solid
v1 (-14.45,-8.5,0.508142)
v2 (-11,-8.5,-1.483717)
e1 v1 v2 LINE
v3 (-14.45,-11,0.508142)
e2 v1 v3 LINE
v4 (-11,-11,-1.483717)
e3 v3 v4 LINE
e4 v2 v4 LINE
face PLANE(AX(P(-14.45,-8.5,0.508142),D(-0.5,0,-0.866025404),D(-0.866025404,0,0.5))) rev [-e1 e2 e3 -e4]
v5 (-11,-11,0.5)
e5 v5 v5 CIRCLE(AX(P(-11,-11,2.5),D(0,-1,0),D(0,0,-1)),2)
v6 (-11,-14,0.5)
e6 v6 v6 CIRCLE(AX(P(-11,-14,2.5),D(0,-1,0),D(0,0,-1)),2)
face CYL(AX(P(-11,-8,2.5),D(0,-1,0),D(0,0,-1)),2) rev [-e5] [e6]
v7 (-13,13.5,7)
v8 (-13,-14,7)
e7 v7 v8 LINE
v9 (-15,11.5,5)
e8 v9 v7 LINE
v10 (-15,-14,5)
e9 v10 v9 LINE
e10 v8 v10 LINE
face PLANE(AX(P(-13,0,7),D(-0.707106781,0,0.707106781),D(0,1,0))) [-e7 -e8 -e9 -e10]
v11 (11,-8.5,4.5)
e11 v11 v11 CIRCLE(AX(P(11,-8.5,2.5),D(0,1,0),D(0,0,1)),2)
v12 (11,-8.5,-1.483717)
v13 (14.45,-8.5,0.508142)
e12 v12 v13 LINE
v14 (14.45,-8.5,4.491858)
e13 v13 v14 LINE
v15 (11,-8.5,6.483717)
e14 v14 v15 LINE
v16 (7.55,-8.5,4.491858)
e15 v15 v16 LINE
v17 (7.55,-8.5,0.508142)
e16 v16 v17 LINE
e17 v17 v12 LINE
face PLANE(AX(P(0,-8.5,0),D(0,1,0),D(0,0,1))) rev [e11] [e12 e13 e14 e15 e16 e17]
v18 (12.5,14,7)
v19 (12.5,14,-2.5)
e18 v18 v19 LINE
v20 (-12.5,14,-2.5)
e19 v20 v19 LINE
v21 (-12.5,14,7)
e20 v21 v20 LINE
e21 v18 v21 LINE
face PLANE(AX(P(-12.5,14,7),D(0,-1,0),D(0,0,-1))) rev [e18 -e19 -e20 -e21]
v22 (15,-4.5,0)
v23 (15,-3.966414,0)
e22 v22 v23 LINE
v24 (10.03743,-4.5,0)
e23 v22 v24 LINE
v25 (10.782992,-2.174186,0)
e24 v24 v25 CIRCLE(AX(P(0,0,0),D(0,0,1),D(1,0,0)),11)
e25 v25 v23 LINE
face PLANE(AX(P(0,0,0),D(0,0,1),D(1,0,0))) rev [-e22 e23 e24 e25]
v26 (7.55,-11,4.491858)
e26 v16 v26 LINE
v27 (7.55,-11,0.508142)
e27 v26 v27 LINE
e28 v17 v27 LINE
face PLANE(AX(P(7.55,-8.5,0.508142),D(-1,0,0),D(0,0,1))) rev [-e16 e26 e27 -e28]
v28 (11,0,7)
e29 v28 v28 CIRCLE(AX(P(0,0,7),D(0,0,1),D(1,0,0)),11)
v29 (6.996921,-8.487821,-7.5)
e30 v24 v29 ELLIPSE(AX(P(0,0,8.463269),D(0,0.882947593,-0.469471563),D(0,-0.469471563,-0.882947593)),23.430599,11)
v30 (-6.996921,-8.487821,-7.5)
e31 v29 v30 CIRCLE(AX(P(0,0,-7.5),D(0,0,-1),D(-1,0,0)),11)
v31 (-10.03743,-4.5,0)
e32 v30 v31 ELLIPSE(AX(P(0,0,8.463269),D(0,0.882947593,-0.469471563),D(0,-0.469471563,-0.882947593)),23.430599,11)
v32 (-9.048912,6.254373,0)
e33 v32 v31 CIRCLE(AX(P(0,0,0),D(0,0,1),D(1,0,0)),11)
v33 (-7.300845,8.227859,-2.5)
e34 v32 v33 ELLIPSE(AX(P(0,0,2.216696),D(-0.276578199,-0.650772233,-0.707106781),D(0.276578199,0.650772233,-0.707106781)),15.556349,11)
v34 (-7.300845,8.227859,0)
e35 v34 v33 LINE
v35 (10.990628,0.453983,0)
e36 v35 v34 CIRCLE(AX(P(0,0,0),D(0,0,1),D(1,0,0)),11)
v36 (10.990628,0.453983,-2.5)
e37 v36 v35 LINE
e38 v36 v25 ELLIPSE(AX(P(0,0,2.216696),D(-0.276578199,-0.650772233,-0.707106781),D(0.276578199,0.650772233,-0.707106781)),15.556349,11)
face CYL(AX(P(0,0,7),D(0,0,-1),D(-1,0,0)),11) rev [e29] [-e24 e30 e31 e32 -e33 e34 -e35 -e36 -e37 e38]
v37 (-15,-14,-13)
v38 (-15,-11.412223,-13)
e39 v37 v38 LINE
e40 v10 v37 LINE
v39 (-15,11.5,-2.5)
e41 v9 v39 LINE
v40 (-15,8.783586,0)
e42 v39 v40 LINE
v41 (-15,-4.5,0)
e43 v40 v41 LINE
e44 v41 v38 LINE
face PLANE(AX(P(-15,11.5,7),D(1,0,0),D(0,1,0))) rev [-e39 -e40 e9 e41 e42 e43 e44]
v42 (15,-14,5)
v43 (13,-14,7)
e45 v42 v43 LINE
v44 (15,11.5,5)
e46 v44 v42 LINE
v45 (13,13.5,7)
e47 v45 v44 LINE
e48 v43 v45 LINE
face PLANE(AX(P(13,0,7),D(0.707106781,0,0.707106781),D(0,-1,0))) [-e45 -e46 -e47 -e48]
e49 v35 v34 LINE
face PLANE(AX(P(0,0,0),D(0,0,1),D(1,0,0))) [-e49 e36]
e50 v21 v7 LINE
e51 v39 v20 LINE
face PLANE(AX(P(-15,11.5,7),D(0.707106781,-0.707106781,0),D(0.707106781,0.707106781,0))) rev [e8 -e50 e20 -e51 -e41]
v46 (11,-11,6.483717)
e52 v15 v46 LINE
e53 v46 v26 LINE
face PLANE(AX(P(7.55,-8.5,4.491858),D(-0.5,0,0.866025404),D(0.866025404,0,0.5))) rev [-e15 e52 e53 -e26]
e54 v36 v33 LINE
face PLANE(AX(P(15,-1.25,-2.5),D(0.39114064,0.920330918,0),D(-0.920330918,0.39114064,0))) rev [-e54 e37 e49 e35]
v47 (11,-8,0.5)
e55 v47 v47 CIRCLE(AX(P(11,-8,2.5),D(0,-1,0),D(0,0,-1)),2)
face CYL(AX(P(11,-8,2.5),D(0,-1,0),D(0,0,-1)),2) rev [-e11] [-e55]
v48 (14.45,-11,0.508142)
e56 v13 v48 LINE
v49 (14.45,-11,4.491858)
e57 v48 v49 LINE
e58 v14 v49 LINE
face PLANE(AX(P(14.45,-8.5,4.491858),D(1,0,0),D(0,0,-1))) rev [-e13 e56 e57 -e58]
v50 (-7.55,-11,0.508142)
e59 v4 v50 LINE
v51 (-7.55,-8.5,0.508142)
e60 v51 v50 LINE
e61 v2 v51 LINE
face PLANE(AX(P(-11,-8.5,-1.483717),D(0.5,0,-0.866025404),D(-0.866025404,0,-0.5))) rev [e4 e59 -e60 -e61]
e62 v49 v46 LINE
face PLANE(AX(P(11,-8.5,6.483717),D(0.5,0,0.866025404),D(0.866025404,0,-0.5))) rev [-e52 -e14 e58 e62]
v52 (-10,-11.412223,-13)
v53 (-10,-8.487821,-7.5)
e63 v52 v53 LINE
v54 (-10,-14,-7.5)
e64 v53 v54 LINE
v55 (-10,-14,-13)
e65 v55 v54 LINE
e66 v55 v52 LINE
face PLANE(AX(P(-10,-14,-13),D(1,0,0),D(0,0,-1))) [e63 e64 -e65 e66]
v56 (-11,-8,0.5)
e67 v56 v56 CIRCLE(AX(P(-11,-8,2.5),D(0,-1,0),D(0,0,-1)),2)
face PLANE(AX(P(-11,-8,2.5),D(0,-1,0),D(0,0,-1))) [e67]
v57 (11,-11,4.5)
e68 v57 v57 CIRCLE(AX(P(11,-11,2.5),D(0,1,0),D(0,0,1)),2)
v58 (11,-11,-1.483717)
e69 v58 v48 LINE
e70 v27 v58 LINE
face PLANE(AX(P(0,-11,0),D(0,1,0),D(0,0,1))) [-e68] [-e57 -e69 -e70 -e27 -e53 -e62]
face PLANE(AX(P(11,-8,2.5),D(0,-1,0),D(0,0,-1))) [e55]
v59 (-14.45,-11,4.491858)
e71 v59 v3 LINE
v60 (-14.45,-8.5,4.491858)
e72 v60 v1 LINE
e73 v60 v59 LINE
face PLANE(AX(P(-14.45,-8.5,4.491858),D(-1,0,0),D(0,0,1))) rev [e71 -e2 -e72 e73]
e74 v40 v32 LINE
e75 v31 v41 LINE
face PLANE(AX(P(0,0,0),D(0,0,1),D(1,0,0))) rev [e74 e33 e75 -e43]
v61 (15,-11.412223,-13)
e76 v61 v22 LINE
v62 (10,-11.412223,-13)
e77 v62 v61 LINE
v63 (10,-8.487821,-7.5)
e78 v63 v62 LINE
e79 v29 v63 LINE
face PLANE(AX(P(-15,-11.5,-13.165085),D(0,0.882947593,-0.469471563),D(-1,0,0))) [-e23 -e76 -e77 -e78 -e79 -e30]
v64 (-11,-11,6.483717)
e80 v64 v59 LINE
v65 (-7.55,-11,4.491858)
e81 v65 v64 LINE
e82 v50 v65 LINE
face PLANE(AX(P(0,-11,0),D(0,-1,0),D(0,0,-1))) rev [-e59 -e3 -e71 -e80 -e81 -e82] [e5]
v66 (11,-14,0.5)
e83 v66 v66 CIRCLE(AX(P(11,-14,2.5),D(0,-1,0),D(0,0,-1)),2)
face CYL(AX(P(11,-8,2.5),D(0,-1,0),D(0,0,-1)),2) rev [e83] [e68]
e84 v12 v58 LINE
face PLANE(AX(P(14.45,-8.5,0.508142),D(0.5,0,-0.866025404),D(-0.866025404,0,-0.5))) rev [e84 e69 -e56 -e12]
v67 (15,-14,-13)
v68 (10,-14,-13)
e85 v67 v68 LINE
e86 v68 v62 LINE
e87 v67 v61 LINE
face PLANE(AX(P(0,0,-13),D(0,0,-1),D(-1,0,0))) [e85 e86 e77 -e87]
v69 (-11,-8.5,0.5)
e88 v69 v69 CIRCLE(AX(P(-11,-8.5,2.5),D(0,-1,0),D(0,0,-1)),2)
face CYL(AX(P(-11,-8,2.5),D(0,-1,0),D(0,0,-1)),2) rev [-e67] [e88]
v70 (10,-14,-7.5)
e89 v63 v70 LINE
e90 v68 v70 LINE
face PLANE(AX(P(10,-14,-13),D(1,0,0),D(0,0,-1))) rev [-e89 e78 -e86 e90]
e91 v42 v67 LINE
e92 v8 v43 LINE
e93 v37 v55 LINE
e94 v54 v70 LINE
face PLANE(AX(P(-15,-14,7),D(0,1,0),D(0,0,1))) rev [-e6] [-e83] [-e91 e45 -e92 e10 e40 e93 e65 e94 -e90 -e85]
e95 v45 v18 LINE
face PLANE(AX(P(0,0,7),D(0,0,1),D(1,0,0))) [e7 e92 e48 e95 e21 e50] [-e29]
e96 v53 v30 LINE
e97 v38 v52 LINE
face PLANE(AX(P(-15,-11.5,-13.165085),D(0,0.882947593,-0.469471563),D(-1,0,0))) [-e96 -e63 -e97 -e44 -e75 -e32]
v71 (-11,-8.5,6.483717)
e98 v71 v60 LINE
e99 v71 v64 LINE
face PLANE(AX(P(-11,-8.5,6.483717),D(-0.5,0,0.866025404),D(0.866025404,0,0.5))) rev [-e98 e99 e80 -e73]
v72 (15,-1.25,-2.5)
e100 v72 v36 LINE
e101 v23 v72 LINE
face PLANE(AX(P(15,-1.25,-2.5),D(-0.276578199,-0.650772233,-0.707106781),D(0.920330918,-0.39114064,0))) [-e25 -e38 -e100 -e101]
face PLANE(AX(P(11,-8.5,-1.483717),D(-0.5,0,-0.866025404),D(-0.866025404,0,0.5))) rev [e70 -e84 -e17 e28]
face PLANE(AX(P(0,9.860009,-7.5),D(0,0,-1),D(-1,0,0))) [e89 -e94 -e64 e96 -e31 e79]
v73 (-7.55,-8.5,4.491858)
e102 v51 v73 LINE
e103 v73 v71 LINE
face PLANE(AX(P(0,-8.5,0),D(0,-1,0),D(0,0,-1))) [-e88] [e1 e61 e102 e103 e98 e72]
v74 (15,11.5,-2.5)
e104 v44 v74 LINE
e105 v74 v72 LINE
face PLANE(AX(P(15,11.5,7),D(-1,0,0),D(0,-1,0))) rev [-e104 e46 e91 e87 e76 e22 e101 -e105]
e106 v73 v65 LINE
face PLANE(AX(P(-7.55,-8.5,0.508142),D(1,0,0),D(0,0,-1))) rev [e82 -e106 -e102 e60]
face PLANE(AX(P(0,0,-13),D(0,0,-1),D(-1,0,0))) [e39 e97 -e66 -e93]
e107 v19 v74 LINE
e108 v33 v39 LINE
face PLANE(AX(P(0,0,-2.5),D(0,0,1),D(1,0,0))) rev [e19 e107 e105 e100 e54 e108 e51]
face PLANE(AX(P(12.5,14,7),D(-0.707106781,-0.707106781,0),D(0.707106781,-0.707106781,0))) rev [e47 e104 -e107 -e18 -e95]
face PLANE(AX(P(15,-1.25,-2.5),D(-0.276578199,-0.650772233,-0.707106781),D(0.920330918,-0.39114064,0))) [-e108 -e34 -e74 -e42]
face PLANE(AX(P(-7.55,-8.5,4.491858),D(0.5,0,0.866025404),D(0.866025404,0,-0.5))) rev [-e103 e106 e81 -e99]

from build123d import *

# Parameters (mm, degrees)
SKETCH1_R           = 11
BOSS_EXTRUDE1_DEPTH = 7
SKETCH2_W           = 5
SKETCH2_H           = 2.5
BOSS_EXTRUDE2_DEPTH = 13
CHAMFER2_SIZE       = 2
BOSS_EXTRUDE6_DEPTH = 2.5
CHAMFER3_SIZE       = 2
CHAMFER4_SIZE       = 2
BOSS_EXTRUDE4_DEPTH = 2.5
CHAMFER6_SIZE       = 2.5
CHAMFER7_SIZE       = 7
CHAMFER7_SIZE_2     = 13.165085257
CUT_EXTRUDE1_START  = -3
SKETCH6_R           = 2
CUT_EXTRUDE1_DEPTH  = 2.5
SKETCH7_R           = 2
CUT_EXTRUDE2_DEPTH  = 6


with BuildPart() as part:
    # Sketch1 → Boss-Extrude1 (new body)
    with BuildSketch(Plane.XY):
        Polygon((-15, 11.5), (-12.5, 14), (12.5, 14), (15, 11.5), (15, -14), (-15, -14), align=None)
        Circle(SKETCH1_R, mode=Mode.SUBTRACT)
    extrude(amount=BOSS_EXTRUDE1_DEPTH)

    # Sketch2 → Boss-Extrude2 (add)
    with BuildSketch(Plane(origin=(0, 0, 0), x_dir=(-1, 0, 0), z_dir=(0, 0, -1))):
        with Locations((-12.5, -12.75)):
            Rectangle(SKETCH2_W, SKETCH2_H)
        with Locations((12.5, -12.75)):
            Rectangle(SKETCH2_W, SKETCH2_H)
    extrude(amount=BOSS_EXTRUDE2_DEPTH)

    # Chamfer2
    chamfer2_edges = [part.edges().sort_by_distance(p)[0] for p in [
        (-10, -12.75, 0),
        (10, -12.75, 0),
    ]]
    chamfer(chamfer2_edges, length=CHAMFER2_SIZE)

    # Sketch5 → Boss-Extrude6 (add)
    with BuildSketch(Plane.XZ.offset(14)):
        Polygon((-10, -2), (-10, -7.5), (10, -7.5), (10, -2), (8, 0), (-8, 0), align=None)
    extrude(amount=-BOSS_EXTRUDE6_DEPTH)

    # Chamfer3
    chamfer3_edges = [part.edges().sort_by_distance(p)[0] for p in [
        (15, -1.25, 7),
    ]]
    chamfer(chamfer3_edges, length=CHAMFER3_SIZE)

    # Chamfer4
    chamfer4_edges = [part.edges().sort_by_distance(p)[0] for p in [
        (-15, -1.25, 7),
    ]]
    chamfer(chamfer4_edges, length=CHAMFER4_SIZE)

    # Sketch4 → Boss-Extrude4 (add)
    with BuildSketch(Plane(origin=(0, 0, 0), x_dir=(-1, 0, 0), z_dir=(0, 0, -1))):
        Polygon((-15, -1.25), (15, 11.5), (12.5, 14), (-12.5, 14), (-15, 11.5), align=None)
    extrude(amount=BOSS_EXTRUDE4_DEPTH)

    # Chamfer6
    # the kernel refuses this chamfer: 2.5 mm, written as the material it adds along each edge
    with BuildSketch(Plane(origin=(20.916998416, -3.764724327, 0), x_dir=(-0.39099275668343275, -0.9199829569021947, 0.02749587661058635), z_dir=(-0.9203309184584746, 0.39114064034485174, 0))) as chamfer6_piece_1_section:
        Polygon((CHAMFER6_SIZE * 0.999621916911, -CHAMFER6_SIZE * 0.0274958766106), (-CHAMFER6_SIZE * 0.0274958766106, -CHAMFER6_SIZE * 0.999621916911), (0, 0), align=None)
    chamfer6_piece_1 = extrude(amount=17.214861222, mode=Mode.PRIVATE)
    chamfer6_piece_1 = chamfer6_piece_1 - Plane(origin=(0, 0, -0.830769879), x_dir=(1, 0, 0), z_dir=(0, 0, -1)) * Cylinder(11, 45, mode=Mode.PRIVATE)
    chamfer6_piece_1 = split(chamfer6_piece_1, bisect_by=Plane(origin=(15, -1.305255327, -0.830769879), z_dir=(-1, 0, 0)), keep=Keep.TOP, mode=Mode.PRIVATE)
    add(chamfer6_piece_1)
    with BuildSketch(Plane(origin=(-1.383846422, 5.71313473, 0), x_dir=(-0.39099275668343275, -0.9199829569021946, 0.02749587661058637), z_dir=(-0.9203309184584746, 0.39114064034485174, 0))) as chamfer6_piece_2_section:
        Polygon((CHAMFER6_SIZE * 0.999621916911, -CHAMFER6_SIZE * 0.0274958766106), (-CHAMFER6_SIZE * 0.0274958766106, -CHAMFER6_SIZE * 0.999621916911), (0, 0), align=None)
    chamfer6_piece_2 = extrude(amount=21.224052785, mode=Mode.PRIVATE)
    chamfer6_piece_2 = chamfer6_piece_2 - Plane(origin=(0, 0, -0.851096237), x_dir=(1, 0, 0), z_dir=(0, 0, -1)) * Cylinder(11, 53, mode=Mode.PRIVATE)
    chamfer6_piece_2 = split(chamfer6_piece_2, bisect_by=Plane(origin=(-15, 9.126408424, -0.851096237), z_dir=(1, 0, 0)), keep=Keep.TOP, mode=Mode.PRIVATE)
    add(chamfer6_piece_2)

    # Chamfer7
    # the kernel refuses this chamfer: 13.165085257, 7 mm, written as the material it adds along each edge
    with BuildSketch(Plane(origin=(-15, -11.5, 0), x_dir=(0, 0.9979482451756082, 0.06402577567608186), z_dir=(1, 0, 0))) as chamfer7_piece_1_section:
        Polygon((CHAMFER7_SIZE * 0.997948245176, -CHAMFER7_SIZE * 0.0640257756761), (-CHAMFER7_SIZE_2 * 0.0640257756781, -CHAMFER7_SIZE_2 * 0.997948245208), (0, 0), align=None)
    chamfer7_piece_1 = extrude(amount=30, mode=Mode.PRIVATE)
    chamfer7_piece_1 = chamfer7_piece_1 - Plane(origin=(0, 0, -3.073682767), x_dir=(1, 0, 0), z_dir=(0, 0, -1)) * Cylinder(11, 113, mode=Mode.PRIVATE)
    chamfer7_piece_1 = split(chamfer7_piece_1, bisect_by=Plane(origin=(-12.500128058, -8.887755394, -7.5), z_dir=(0, 0, 1)), keep=Keep.TOP, mode=Mode.PRIVATE)
    chamfer7_piece_1 = split(chamfer7_piece_1, bisect_by=Plane(origin=(-10, -8.887755394, -3.073682767), z_dir=(-1, 0, 0)), keep=Keep.TOP, mode=Mode.PRIVATE)
    add(chamfer7_piece_1)
    with BuildSketch(Plane(origin=(-15, -11.5, 0), x_dir=(0, 0.9979482451756082, 0.06402577567608186), z_dir=(1, 0, 0))) as chamfer7_piece_2_section:
        Polygon((CHAMFER7_SIZE * 0.997948245176, -CHAMFER7_SIZE * 0.0640257756761), (-CHAMFER7_SIZE_2 * 0.0640257756781, -CHAMFER7_SIZE_2 * 0.997948245208), (0, 0), align=None)
    chamfer7_piece_2 = extrude(amount=30, mode=Mode.PRIVATE)
    chamfer7_piece_2 = split(chamfer7_piece_2, bisect_by=Plane(origin=(-12.5, -10.721530873, -7.5), z_dir=(0, 0, -1)), keep=Keep.TOP, mode=Mode.PRIVATE)
    chamfer7_piece_2 = split(chamfer7_piece_2, bisect_by=Plane(origin=(-10, -10.721530873, -9.597564575), z_dir=(-1, 0, 0)), keep=Keep.TOP, mode=Mode.PRIVATE)
    chamfer7_piece_2 = split(chamfer7_piece_2, bisect_by=Plane(origin=(-12.5, -10.721530873, -13), z_dir=(0, 0, 1)), keep=Keep.TOP, mode=Mode.PRIVATE)
    add(chamfer7_piece_2)
    with BuildSketch(Plane(origin=(-15, -11.5, 0), x_dir=(0, 0.9979482451756082, 0.06402577567608186), z_dir=(1, 0, 0))) as chamfer7_piece_3_section:
        Polygon((CHAMFER7_SIZE * 0.997948245176, -CHAMFER7_SIZE * 0.0640257756761), (-CHAMFER7_SIZE_2 * 0.0640257756781, -CHAMFER7_SIZE_2 * 0.997948245208), (0, 0), align=None)
    chamfer7_piece_3 = extrude(amount=30, mode=Mode.PRIVATE)
    chamfer7_piece_3 = chamfer7_piece_3 - Plane(origin=(0, 0, -3.793876077), x_dir=(1, 0, 0), z_dir=(0, 0, -1)) * Cylinder(11, 113, mode=Mode.PRIVATE)
    chamfer7_piece_3 = split(chamfer7_piece_3, bisect_by=Plane(origin=(-9.499486782, -6.598719884, -7.5), z_dir=(0, 0, 1)), keep=Keep.TOP, mode=Mode.PRIVATE)
    chamfer7_piece_3 = split(chamfer7_piece_3, bisect_by=Plane(origin=(10, -6.598719884, -3.793876077), z_dir=(-1, 0, 0)), keep=Keep.TOP, mode=Mode.PRIVATE)
    chamfer7_piece_3 = split(chamfer7_piece_3, bisect_by=Plane(origin=(-10, -6.598719884, -3.793876077), z_dir=(1, 0, 0)), keep=Keep.TOP, mode=Mode.PRIVATE)
    add(chamfer7_piece_3)
    with BuildSketch(Plane(origin=(-15, -11.5, 0), x_dir=(0, 0.9979482451756082, 0.06402577567608186), z_dir=(1, 0, 0))) as chamfer7_piece_4_section:
        Polygon((CHAMFER7_SIZE * 0.997948245176, -CHAMFER7_SIZE * 0.0640257756761), (-CHAMFER7_SIZE_2 * 0.0640257756781, -CHAMFER7_SIZE_2 * 0.997948245208), (0, 0), align=None)
    chamfer7_piece_4 = extrude(amount=30, mode=Mode.PRIVATE)
    chamfer7_piece_4 = split(chamfer7_piece_4, bisect_by=Plane(origin=(12.5, -10.721530873, -7.5), z_dir=(0, 0, -1)), keep=Keep.TOP, mode=Mode.PRIVATE)
    chamfer7_piece_4 = split(chamfer7_piece_4, bisect_by=Plane(origin=(10, -10.721530873, -9.597564575), z_dir=(1, 0, 0)), keep=Keep.TOP, mode=Mode.PRIVATE)
    chamfer7_piece_4 = split(chamfer7_piece_4, bisect_by=Plane(origin=(12.5, -10.721530873, -13), z_dir=(0, 0, 1)), keep=Keep.TOP, mode=Mode.PRIVATE)
    add(chamfer7_piece_4)
    with BuildSketch(Plane(origin=(-15, -11.5, 0), x_dir=(0, 0.9979482451756082, 0.06402577567608186), z_dir=(1, 0, 0))) as chamfer7_piece_5_section:
        Polygon((CHAMFER7_SIZE * 0.997948245176, -CHAMFER7_SIZE * 0.0640257756761), (-CHAMFER7_SIZE_2 * 0.0640257756781, -CHAMFER7_SIZE_2 * 0.997948245208), (0, 0), align=None)
    chamfer7_piece_5 = extrude(amount=30, mode=Mode.PRIVATE)
    chamfer7_piece_5 = chamfer7_piece_5 - Plane(origin=(0, 0, -3.073682766), x_dir=(1, 0, 0), z_dir=(0, 0, -1)) * Cylinder(11, 113, mode=Mode.PRIVATE)
    chamfer7_piece_5 = split(chamfer7_piece_5, bisect_by=Plane(origin=(12.500128057, -8.887755394, -7.5), z_dir=(0, 0, 1)), keep=Keep.TOP, mode=Mode.PRIVATE)
    chamfer7_piece_5 = split(chamfer7_piece_5, bisect_by=Plane(origin=(10, -8.887755394, -3.073682766), z_dir=(1, 0, 0)), keep=Keep.TOP, mode=Mode.PRIVATE)
    add(chamfer7_piece_5)

    # Sketch6 → Cut-Extrude1 (cut)
    # profile 1 of 2: a face of its own
    with BuildSketch(Plane.XZ.offset(14).offset(CUT_EXTRUDE1_START)):
        Polygon((-7.55, 0.508141571), (-7.55, 4.491858429), (-11, 6.483716857), (-14.45, 4.491858429), (-14.45, 0.508141571), (-11, -1.483716857), align=None)
        with Locations(Location((-11, 2.5, 0), (0, 0, 270))):
            Circle(SKETCH6_R, mode=Mode.SUBTRACT)
    # profile 2 of 2: a face of its own
    with BuildSketch(Plane.XZ.offset(14).offset(CUT_EXTRUDE1_START)):
        Polygon((11, -1.483716857), (7.55, 0.508141571), (7.55, 4.491858429), (11, 6.483716857), (14.45, 4.491858429), (14.45, 0.508141571), align=None)
    extrude(amount=-CUT_EXTRUDE1_DEPTH, mode=Mode.SUBTRACT)

    # Sketch7 → Cut-Extrude2 (cut)
    with BuildSketch(Plane.XZ.offset(14)):
        with Locations(Location((11, 2.5, 0), (0, 0, 270))):
            Circle(SKETCH7_R)
        with Locations(Location((-11, 2.5, 0), (0, 0, 270))):
            Circle(SKETCH7_R)
    extrude(amount=-CUT_EXTRUDE2_DEPTH, mode=Mode.SUBTRACT)


solid = part.part
